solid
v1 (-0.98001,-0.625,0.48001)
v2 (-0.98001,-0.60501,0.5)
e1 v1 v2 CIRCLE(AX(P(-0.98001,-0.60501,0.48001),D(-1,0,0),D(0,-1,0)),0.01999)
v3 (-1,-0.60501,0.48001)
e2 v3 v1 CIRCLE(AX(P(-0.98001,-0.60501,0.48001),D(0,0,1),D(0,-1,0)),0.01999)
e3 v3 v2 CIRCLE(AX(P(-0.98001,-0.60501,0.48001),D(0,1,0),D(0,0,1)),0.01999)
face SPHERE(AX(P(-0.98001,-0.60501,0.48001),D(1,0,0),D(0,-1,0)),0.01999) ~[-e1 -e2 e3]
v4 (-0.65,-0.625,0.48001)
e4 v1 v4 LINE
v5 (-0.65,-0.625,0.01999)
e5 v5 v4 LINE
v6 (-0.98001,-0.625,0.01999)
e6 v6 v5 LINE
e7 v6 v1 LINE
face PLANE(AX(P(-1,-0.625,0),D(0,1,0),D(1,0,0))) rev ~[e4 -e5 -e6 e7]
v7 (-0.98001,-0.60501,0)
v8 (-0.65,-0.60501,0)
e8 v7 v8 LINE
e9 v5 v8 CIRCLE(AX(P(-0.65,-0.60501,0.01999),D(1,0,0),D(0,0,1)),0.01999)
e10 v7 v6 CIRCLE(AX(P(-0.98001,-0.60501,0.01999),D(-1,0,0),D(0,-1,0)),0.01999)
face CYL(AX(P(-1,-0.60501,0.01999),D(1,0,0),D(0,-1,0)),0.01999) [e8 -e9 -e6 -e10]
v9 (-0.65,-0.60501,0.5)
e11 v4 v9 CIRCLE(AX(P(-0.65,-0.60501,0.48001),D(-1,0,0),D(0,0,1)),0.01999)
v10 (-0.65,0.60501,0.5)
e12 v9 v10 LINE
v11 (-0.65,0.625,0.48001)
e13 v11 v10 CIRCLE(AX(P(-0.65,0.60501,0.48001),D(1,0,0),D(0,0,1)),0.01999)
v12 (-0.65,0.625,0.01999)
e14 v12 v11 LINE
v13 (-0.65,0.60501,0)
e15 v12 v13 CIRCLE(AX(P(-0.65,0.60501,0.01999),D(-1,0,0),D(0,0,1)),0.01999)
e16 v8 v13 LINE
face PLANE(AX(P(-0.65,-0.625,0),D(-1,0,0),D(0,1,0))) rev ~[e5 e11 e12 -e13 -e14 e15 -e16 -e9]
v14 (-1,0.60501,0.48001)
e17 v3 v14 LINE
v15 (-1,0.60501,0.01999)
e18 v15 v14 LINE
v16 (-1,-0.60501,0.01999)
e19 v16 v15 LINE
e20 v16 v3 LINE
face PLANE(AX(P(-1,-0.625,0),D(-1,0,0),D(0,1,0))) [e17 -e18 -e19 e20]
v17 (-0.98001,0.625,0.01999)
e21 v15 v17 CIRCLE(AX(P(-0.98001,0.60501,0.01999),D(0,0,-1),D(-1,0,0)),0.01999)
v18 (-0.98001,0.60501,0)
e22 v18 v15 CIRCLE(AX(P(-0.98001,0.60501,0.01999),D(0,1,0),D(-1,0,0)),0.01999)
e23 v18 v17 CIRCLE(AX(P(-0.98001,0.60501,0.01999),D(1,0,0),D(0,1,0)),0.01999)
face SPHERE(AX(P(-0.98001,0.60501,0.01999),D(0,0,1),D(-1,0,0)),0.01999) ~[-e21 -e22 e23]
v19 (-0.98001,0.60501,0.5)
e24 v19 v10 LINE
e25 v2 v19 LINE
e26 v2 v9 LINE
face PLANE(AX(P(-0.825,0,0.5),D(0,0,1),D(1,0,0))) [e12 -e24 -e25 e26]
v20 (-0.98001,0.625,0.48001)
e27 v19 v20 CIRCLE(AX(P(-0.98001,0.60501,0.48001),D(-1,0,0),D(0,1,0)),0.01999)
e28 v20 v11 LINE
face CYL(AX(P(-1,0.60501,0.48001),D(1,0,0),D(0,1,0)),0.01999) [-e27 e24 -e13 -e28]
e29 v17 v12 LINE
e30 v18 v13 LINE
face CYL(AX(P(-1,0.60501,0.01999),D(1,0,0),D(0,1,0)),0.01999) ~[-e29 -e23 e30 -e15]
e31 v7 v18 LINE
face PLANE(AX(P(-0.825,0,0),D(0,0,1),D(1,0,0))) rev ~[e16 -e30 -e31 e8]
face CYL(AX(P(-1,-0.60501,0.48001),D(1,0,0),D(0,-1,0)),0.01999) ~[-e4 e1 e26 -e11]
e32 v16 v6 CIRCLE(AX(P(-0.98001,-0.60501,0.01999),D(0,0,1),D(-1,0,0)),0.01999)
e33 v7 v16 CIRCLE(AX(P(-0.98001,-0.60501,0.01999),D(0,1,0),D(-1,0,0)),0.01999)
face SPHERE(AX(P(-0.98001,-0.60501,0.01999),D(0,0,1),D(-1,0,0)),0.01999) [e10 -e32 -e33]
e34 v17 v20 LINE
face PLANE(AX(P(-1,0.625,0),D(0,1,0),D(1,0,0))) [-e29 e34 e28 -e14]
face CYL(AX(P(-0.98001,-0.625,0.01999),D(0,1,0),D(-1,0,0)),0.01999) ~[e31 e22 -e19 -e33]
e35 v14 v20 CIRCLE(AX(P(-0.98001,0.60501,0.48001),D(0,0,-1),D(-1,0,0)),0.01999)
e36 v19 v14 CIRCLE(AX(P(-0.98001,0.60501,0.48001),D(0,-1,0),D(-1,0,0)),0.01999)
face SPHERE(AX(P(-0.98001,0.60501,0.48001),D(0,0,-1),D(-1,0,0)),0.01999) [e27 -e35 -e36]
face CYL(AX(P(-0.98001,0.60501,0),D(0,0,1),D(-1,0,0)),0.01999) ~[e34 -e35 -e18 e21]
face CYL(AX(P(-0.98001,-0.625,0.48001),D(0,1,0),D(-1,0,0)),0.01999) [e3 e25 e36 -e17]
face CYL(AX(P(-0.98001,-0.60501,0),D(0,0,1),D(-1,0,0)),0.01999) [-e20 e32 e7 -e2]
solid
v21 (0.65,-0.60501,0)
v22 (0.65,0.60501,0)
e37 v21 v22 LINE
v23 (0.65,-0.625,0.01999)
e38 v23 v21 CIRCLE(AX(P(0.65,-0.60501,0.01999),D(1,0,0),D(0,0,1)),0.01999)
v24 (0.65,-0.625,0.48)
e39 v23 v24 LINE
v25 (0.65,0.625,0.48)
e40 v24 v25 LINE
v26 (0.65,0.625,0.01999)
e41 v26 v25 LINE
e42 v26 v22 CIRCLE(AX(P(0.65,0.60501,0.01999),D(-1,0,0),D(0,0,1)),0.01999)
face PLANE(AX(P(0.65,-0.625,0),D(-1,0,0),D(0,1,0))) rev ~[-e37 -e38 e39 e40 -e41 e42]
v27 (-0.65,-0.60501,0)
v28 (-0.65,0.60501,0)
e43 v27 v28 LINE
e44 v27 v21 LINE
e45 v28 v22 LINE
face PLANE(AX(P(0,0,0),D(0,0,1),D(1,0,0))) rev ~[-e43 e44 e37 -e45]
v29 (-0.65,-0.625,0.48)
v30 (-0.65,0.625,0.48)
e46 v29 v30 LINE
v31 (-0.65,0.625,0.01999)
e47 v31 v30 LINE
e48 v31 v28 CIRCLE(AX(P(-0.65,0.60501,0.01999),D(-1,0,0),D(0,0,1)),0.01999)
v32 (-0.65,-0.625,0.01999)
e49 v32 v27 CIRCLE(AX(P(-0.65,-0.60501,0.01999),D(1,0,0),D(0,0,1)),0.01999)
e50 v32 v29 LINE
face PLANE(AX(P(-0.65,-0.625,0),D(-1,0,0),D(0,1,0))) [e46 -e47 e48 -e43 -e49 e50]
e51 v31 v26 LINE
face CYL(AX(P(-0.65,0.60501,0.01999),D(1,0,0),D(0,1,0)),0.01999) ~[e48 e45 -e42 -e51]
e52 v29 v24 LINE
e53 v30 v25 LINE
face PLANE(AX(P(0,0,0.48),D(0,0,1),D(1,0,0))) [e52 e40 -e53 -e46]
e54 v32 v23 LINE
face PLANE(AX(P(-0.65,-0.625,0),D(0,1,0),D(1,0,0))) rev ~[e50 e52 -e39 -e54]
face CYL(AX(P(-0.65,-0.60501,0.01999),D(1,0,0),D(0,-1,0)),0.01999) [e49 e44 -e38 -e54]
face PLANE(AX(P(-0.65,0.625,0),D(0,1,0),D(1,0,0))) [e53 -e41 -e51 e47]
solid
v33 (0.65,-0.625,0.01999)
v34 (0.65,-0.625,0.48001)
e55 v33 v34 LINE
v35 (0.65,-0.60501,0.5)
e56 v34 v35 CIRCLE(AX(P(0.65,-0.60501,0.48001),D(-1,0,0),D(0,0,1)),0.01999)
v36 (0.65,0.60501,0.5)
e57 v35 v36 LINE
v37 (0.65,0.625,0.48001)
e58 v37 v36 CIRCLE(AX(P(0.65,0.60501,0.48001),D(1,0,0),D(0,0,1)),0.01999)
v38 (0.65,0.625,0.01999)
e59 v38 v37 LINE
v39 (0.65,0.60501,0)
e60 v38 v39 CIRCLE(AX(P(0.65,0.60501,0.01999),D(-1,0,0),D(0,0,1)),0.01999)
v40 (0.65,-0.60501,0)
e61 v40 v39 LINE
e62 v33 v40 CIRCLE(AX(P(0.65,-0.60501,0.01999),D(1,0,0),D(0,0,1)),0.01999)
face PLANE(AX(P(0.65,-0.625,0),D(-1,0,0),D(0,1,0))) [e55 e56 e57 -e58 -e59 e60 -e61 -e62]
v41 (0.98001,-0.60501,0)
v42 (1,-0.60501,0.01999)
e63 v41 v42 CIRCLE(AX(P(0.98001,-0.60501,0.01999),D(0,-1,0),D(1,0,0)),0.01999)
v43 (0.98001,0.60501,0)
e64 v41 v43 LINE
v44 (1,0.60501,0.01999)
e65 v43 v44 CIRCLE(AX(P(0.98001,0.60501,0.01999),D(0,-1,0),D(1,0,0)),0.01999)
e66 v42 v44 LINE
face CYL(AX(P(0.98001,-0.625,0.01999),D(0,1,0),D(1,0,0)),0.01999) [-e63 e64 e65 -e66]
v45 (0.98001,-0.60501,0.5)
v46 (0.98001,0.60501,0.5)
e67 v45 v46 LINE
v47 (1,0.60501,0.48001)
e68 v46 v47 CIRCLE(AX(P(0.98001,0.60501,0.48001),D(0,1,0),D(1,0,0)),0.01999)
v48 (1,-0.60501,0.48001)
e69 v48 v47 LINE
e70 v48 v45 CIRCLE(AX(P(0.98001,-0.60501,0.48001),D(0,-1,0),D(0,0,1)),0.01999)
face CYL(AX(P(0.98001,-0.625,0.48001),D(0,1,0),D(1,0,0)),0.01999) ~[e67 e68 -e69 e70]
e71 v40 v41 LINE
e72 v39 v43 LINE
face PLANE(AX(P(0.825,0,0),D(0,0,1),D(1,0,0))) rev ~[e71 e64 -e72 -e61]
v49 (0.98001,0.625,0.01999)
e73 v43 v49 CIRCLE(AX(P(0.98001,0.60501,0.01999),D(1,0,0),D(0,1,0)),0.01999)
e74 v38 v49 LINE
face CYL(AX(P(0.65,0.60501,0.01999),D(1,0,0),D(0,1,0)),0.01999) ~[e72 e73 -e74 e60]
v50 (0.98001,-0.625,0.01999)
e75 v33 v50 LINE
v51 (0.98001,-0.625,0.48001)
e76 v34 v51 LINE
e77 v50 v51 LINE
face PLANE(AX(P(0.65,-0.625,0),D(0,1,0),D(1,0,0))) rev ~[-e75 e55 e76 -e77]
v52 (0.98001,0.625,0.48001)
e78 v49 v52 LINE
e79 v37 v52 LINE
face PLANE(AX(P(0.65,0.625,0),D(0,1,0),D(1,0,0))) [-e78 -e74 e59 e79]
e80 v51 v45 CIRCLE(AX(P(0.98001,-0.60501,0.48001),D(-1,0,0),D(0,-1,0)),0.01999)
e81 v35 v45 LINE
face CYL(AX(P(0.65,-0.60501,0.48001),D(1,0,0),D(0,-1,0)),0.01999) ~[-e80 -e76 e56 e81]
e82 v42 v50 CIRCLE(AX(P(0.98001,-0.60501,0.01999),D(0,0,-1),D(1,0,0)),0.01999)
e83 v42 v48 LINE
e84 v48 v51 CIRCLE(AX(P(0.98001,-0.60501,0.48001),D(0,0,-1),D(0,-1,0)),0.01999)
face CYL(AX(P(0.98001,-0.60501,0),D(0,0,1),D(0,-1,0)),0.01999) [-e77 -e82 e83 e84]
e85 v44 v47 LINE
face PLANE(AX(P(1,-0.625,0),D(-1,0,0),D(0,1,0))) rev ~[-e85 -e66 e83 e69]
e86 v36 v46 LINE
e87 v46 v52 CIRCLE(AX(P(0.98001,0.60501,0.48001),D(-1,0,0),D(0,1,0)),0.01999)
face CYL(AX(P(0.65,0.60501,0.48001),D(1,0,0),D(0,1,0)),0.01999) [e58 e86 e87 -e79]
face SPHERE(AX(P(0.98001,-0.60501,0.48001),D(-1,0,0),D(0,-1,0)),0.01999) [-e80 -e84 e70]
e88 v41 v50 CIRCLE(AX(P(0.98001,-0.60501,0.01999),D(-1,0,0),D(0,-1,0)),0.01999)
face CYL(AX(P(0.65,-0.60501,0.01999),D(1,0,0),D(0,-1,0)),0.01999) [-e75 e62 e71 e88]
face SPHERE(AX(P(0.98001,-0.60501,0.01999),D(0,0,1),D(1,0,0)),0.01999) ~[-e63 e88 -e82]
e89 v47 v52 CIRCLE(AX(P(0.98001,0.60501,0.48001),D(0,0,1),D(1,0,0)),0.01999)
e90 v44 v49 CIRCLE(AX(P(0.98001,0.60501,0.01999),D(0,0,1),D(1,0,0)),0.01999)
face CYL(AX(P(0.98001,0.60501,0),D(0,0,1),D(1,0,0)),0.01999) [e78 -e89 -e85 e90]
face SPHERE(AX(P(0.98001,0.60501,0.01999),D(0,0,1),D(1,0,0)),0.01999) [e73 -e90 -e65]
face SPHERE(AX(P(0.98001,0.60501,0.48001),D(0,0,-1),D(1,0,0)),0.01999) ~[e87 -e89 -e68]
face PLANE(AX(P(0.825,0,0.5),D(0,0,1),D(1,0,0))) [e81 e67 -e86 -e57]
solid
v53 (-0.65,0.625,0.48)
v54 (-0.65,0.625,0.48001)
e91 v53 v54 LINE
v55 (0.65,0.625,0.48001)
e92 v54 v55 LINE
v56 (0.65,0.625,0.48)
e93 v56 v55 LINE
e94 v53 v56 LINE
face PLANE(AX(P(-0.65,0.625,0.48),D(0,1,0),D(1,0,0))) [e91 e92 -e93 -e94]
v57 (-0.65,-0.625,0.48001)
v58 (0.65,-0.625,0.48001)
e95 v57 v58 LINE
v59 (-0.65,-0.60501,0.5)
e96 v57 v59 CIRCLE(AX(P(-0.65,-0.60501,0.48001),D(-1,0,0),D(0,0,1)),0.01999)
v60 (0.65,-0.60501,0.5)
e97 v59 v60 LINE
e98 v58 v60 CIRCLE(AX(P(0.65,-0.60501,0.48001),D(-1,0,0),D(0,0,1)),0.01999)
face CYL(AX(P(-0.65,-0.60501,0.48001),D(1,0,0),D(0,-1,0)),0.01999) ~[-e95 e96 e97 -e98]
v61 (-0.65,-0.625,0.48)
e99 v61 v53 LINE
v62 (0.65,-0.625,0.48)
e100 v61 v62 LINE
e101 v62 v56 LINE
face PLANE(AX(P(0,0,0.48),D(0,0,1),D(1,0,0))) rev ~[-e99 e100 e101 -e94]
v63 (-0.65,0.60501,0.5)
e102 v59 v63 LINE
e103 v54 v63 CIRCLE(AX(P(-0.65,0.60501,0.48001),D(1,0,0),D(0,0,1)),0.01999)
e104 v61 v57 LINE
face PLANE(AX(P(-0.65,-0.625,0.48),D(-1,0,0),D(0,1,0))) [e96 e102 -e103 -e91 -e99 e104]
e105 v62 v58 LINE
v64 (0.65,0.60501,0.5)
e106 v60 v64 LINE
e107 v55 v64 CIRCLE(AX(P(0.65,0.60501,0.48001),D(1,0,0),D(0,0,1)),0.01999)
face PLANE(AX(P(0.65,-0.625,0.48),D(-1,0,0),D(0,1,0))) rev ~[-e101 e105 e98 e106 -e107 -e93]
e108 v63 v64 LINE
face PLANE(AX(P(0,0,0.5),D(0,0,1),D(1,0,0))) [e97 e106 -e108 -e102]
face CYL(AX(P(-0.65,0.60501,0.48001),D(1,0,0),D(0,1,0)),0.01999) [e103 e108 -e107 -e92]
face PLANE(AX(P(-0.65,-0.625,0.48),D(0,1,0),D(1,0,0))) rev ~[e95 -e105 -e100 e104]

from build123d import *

# Parameters (mm, degrees)
F2_W     = 1.3
F2_H     = 1.25
F3_DEPTH = 0.48
F2_W_2   = 0.35
F4_DEPTH = 0.5
F5_DEPTH = 0.5
F6_DEPTH = 0.02
F7_R     = 0.01999
F7_2_R   = 0.01999
F7_3_R   = 0.01999
F7_4_R   = 0.01999


# Not quite as in the source:
# - a fillet or chamfer is up to 0.001 mm smaller than in the source, because OpenCascade refuses the exact size


with BuildPart() as f3:
    # F2 (on Top) → F3 (new body)
    with BuildSketch(Plane.XY):
        Rectangle(F2_W, F2_H)
    extrude(amount=F3_DEPTH)


with BuildPart() as f4:
    # F2 (on Top) → F4 (new body)
    with BuildSketch(Plane.XY):
        with Locations((-0.825, 0)):
            Rectangle(F2_W_2, F2_H)
    extrude(amount=F4_DEPTH)

    # F7 (radius 0.02 in the source; OpenCascade refuses exactly that, so slightly less here)
    f7_edges = [f4.edges().sort_by_distance(p)[0] for p in [
        (-0.825, -0.625, 0.5),
        (-1, 0.625, 0.25),
        (-1, -0.625, 0.25),
        (-1, 0, 0),
        (-1, 0, 0.5),
        (-0.825, 0.625, 0.5),
        (-0.825, 0.625, 0),
        (-0.825, -0.625, 0),
    ]]
    fillet(f7_edges, radius=F7_R)


with BuildPart() as f5:
    # F2 (on Top) → F5 (new body)
    with BuildSketch(Plane.XY):
        with Locations((0.825, 0)):
            Rectangle(F2_W_2, F2_H)
    extrude(amount=F5_DEPTH)

    # F7#2 (radius 0.02 in the source; OpenCascade refuses exactly that, so slightly less here)
    f7_2_edges = [f5.edges().sort_by_distance(p)[0] for p in [
        (0.825, -0.625, 0.5),
        (1, -0.625, 0.25),
        (1, 0.625, 0.25),
        (1, 0, 0),
        (1, 0, 0.5),
        (0.825, 0.625, 0.5),
        (0.825, 0.625, 0),
        (0.825, -0.625, 0),
    ]]
    fillet(f7_2_edges, radius=F7_2_R)


with BuildPart() as f6:
    # F6 (new): a face of the model
    f6_faces = [f3.part.faces().sort_by_distance(p)[0] for p in [
        (0, 0, 0.48),
    ]]
    extrude(f6_faces, amount=F6_DEPTH)

    # F7#4 (radius 0.02 in the source; OpenCascade refuses exactly that, so slightly less here)
    f7_4_edges = [f6.edges().sort_by_distance(p)[0] for p in [
        (0, -0.625, 0.5),
        (0, 0.625, 0.5),
    ]]
    fillet(f7_4_edges, radius=F7_4_R)


with BuildPart() as f3_1:
    add(f3.part)

    # F7#3 (radius 0.02 in the source; OpenCascade refuses exactly that, so slightly less here)
    f7_3_edges = [f3_1.edges().sort_by_distance(p)[0] for p in [
        (0, 0.625, 0),
        (0, -0.625, 0),
    ]]
    fillet(f7_3_edges, radius=F7_3_R)


solid = Compound([f4.part, f5.part, f6.part, f3_1.part])
